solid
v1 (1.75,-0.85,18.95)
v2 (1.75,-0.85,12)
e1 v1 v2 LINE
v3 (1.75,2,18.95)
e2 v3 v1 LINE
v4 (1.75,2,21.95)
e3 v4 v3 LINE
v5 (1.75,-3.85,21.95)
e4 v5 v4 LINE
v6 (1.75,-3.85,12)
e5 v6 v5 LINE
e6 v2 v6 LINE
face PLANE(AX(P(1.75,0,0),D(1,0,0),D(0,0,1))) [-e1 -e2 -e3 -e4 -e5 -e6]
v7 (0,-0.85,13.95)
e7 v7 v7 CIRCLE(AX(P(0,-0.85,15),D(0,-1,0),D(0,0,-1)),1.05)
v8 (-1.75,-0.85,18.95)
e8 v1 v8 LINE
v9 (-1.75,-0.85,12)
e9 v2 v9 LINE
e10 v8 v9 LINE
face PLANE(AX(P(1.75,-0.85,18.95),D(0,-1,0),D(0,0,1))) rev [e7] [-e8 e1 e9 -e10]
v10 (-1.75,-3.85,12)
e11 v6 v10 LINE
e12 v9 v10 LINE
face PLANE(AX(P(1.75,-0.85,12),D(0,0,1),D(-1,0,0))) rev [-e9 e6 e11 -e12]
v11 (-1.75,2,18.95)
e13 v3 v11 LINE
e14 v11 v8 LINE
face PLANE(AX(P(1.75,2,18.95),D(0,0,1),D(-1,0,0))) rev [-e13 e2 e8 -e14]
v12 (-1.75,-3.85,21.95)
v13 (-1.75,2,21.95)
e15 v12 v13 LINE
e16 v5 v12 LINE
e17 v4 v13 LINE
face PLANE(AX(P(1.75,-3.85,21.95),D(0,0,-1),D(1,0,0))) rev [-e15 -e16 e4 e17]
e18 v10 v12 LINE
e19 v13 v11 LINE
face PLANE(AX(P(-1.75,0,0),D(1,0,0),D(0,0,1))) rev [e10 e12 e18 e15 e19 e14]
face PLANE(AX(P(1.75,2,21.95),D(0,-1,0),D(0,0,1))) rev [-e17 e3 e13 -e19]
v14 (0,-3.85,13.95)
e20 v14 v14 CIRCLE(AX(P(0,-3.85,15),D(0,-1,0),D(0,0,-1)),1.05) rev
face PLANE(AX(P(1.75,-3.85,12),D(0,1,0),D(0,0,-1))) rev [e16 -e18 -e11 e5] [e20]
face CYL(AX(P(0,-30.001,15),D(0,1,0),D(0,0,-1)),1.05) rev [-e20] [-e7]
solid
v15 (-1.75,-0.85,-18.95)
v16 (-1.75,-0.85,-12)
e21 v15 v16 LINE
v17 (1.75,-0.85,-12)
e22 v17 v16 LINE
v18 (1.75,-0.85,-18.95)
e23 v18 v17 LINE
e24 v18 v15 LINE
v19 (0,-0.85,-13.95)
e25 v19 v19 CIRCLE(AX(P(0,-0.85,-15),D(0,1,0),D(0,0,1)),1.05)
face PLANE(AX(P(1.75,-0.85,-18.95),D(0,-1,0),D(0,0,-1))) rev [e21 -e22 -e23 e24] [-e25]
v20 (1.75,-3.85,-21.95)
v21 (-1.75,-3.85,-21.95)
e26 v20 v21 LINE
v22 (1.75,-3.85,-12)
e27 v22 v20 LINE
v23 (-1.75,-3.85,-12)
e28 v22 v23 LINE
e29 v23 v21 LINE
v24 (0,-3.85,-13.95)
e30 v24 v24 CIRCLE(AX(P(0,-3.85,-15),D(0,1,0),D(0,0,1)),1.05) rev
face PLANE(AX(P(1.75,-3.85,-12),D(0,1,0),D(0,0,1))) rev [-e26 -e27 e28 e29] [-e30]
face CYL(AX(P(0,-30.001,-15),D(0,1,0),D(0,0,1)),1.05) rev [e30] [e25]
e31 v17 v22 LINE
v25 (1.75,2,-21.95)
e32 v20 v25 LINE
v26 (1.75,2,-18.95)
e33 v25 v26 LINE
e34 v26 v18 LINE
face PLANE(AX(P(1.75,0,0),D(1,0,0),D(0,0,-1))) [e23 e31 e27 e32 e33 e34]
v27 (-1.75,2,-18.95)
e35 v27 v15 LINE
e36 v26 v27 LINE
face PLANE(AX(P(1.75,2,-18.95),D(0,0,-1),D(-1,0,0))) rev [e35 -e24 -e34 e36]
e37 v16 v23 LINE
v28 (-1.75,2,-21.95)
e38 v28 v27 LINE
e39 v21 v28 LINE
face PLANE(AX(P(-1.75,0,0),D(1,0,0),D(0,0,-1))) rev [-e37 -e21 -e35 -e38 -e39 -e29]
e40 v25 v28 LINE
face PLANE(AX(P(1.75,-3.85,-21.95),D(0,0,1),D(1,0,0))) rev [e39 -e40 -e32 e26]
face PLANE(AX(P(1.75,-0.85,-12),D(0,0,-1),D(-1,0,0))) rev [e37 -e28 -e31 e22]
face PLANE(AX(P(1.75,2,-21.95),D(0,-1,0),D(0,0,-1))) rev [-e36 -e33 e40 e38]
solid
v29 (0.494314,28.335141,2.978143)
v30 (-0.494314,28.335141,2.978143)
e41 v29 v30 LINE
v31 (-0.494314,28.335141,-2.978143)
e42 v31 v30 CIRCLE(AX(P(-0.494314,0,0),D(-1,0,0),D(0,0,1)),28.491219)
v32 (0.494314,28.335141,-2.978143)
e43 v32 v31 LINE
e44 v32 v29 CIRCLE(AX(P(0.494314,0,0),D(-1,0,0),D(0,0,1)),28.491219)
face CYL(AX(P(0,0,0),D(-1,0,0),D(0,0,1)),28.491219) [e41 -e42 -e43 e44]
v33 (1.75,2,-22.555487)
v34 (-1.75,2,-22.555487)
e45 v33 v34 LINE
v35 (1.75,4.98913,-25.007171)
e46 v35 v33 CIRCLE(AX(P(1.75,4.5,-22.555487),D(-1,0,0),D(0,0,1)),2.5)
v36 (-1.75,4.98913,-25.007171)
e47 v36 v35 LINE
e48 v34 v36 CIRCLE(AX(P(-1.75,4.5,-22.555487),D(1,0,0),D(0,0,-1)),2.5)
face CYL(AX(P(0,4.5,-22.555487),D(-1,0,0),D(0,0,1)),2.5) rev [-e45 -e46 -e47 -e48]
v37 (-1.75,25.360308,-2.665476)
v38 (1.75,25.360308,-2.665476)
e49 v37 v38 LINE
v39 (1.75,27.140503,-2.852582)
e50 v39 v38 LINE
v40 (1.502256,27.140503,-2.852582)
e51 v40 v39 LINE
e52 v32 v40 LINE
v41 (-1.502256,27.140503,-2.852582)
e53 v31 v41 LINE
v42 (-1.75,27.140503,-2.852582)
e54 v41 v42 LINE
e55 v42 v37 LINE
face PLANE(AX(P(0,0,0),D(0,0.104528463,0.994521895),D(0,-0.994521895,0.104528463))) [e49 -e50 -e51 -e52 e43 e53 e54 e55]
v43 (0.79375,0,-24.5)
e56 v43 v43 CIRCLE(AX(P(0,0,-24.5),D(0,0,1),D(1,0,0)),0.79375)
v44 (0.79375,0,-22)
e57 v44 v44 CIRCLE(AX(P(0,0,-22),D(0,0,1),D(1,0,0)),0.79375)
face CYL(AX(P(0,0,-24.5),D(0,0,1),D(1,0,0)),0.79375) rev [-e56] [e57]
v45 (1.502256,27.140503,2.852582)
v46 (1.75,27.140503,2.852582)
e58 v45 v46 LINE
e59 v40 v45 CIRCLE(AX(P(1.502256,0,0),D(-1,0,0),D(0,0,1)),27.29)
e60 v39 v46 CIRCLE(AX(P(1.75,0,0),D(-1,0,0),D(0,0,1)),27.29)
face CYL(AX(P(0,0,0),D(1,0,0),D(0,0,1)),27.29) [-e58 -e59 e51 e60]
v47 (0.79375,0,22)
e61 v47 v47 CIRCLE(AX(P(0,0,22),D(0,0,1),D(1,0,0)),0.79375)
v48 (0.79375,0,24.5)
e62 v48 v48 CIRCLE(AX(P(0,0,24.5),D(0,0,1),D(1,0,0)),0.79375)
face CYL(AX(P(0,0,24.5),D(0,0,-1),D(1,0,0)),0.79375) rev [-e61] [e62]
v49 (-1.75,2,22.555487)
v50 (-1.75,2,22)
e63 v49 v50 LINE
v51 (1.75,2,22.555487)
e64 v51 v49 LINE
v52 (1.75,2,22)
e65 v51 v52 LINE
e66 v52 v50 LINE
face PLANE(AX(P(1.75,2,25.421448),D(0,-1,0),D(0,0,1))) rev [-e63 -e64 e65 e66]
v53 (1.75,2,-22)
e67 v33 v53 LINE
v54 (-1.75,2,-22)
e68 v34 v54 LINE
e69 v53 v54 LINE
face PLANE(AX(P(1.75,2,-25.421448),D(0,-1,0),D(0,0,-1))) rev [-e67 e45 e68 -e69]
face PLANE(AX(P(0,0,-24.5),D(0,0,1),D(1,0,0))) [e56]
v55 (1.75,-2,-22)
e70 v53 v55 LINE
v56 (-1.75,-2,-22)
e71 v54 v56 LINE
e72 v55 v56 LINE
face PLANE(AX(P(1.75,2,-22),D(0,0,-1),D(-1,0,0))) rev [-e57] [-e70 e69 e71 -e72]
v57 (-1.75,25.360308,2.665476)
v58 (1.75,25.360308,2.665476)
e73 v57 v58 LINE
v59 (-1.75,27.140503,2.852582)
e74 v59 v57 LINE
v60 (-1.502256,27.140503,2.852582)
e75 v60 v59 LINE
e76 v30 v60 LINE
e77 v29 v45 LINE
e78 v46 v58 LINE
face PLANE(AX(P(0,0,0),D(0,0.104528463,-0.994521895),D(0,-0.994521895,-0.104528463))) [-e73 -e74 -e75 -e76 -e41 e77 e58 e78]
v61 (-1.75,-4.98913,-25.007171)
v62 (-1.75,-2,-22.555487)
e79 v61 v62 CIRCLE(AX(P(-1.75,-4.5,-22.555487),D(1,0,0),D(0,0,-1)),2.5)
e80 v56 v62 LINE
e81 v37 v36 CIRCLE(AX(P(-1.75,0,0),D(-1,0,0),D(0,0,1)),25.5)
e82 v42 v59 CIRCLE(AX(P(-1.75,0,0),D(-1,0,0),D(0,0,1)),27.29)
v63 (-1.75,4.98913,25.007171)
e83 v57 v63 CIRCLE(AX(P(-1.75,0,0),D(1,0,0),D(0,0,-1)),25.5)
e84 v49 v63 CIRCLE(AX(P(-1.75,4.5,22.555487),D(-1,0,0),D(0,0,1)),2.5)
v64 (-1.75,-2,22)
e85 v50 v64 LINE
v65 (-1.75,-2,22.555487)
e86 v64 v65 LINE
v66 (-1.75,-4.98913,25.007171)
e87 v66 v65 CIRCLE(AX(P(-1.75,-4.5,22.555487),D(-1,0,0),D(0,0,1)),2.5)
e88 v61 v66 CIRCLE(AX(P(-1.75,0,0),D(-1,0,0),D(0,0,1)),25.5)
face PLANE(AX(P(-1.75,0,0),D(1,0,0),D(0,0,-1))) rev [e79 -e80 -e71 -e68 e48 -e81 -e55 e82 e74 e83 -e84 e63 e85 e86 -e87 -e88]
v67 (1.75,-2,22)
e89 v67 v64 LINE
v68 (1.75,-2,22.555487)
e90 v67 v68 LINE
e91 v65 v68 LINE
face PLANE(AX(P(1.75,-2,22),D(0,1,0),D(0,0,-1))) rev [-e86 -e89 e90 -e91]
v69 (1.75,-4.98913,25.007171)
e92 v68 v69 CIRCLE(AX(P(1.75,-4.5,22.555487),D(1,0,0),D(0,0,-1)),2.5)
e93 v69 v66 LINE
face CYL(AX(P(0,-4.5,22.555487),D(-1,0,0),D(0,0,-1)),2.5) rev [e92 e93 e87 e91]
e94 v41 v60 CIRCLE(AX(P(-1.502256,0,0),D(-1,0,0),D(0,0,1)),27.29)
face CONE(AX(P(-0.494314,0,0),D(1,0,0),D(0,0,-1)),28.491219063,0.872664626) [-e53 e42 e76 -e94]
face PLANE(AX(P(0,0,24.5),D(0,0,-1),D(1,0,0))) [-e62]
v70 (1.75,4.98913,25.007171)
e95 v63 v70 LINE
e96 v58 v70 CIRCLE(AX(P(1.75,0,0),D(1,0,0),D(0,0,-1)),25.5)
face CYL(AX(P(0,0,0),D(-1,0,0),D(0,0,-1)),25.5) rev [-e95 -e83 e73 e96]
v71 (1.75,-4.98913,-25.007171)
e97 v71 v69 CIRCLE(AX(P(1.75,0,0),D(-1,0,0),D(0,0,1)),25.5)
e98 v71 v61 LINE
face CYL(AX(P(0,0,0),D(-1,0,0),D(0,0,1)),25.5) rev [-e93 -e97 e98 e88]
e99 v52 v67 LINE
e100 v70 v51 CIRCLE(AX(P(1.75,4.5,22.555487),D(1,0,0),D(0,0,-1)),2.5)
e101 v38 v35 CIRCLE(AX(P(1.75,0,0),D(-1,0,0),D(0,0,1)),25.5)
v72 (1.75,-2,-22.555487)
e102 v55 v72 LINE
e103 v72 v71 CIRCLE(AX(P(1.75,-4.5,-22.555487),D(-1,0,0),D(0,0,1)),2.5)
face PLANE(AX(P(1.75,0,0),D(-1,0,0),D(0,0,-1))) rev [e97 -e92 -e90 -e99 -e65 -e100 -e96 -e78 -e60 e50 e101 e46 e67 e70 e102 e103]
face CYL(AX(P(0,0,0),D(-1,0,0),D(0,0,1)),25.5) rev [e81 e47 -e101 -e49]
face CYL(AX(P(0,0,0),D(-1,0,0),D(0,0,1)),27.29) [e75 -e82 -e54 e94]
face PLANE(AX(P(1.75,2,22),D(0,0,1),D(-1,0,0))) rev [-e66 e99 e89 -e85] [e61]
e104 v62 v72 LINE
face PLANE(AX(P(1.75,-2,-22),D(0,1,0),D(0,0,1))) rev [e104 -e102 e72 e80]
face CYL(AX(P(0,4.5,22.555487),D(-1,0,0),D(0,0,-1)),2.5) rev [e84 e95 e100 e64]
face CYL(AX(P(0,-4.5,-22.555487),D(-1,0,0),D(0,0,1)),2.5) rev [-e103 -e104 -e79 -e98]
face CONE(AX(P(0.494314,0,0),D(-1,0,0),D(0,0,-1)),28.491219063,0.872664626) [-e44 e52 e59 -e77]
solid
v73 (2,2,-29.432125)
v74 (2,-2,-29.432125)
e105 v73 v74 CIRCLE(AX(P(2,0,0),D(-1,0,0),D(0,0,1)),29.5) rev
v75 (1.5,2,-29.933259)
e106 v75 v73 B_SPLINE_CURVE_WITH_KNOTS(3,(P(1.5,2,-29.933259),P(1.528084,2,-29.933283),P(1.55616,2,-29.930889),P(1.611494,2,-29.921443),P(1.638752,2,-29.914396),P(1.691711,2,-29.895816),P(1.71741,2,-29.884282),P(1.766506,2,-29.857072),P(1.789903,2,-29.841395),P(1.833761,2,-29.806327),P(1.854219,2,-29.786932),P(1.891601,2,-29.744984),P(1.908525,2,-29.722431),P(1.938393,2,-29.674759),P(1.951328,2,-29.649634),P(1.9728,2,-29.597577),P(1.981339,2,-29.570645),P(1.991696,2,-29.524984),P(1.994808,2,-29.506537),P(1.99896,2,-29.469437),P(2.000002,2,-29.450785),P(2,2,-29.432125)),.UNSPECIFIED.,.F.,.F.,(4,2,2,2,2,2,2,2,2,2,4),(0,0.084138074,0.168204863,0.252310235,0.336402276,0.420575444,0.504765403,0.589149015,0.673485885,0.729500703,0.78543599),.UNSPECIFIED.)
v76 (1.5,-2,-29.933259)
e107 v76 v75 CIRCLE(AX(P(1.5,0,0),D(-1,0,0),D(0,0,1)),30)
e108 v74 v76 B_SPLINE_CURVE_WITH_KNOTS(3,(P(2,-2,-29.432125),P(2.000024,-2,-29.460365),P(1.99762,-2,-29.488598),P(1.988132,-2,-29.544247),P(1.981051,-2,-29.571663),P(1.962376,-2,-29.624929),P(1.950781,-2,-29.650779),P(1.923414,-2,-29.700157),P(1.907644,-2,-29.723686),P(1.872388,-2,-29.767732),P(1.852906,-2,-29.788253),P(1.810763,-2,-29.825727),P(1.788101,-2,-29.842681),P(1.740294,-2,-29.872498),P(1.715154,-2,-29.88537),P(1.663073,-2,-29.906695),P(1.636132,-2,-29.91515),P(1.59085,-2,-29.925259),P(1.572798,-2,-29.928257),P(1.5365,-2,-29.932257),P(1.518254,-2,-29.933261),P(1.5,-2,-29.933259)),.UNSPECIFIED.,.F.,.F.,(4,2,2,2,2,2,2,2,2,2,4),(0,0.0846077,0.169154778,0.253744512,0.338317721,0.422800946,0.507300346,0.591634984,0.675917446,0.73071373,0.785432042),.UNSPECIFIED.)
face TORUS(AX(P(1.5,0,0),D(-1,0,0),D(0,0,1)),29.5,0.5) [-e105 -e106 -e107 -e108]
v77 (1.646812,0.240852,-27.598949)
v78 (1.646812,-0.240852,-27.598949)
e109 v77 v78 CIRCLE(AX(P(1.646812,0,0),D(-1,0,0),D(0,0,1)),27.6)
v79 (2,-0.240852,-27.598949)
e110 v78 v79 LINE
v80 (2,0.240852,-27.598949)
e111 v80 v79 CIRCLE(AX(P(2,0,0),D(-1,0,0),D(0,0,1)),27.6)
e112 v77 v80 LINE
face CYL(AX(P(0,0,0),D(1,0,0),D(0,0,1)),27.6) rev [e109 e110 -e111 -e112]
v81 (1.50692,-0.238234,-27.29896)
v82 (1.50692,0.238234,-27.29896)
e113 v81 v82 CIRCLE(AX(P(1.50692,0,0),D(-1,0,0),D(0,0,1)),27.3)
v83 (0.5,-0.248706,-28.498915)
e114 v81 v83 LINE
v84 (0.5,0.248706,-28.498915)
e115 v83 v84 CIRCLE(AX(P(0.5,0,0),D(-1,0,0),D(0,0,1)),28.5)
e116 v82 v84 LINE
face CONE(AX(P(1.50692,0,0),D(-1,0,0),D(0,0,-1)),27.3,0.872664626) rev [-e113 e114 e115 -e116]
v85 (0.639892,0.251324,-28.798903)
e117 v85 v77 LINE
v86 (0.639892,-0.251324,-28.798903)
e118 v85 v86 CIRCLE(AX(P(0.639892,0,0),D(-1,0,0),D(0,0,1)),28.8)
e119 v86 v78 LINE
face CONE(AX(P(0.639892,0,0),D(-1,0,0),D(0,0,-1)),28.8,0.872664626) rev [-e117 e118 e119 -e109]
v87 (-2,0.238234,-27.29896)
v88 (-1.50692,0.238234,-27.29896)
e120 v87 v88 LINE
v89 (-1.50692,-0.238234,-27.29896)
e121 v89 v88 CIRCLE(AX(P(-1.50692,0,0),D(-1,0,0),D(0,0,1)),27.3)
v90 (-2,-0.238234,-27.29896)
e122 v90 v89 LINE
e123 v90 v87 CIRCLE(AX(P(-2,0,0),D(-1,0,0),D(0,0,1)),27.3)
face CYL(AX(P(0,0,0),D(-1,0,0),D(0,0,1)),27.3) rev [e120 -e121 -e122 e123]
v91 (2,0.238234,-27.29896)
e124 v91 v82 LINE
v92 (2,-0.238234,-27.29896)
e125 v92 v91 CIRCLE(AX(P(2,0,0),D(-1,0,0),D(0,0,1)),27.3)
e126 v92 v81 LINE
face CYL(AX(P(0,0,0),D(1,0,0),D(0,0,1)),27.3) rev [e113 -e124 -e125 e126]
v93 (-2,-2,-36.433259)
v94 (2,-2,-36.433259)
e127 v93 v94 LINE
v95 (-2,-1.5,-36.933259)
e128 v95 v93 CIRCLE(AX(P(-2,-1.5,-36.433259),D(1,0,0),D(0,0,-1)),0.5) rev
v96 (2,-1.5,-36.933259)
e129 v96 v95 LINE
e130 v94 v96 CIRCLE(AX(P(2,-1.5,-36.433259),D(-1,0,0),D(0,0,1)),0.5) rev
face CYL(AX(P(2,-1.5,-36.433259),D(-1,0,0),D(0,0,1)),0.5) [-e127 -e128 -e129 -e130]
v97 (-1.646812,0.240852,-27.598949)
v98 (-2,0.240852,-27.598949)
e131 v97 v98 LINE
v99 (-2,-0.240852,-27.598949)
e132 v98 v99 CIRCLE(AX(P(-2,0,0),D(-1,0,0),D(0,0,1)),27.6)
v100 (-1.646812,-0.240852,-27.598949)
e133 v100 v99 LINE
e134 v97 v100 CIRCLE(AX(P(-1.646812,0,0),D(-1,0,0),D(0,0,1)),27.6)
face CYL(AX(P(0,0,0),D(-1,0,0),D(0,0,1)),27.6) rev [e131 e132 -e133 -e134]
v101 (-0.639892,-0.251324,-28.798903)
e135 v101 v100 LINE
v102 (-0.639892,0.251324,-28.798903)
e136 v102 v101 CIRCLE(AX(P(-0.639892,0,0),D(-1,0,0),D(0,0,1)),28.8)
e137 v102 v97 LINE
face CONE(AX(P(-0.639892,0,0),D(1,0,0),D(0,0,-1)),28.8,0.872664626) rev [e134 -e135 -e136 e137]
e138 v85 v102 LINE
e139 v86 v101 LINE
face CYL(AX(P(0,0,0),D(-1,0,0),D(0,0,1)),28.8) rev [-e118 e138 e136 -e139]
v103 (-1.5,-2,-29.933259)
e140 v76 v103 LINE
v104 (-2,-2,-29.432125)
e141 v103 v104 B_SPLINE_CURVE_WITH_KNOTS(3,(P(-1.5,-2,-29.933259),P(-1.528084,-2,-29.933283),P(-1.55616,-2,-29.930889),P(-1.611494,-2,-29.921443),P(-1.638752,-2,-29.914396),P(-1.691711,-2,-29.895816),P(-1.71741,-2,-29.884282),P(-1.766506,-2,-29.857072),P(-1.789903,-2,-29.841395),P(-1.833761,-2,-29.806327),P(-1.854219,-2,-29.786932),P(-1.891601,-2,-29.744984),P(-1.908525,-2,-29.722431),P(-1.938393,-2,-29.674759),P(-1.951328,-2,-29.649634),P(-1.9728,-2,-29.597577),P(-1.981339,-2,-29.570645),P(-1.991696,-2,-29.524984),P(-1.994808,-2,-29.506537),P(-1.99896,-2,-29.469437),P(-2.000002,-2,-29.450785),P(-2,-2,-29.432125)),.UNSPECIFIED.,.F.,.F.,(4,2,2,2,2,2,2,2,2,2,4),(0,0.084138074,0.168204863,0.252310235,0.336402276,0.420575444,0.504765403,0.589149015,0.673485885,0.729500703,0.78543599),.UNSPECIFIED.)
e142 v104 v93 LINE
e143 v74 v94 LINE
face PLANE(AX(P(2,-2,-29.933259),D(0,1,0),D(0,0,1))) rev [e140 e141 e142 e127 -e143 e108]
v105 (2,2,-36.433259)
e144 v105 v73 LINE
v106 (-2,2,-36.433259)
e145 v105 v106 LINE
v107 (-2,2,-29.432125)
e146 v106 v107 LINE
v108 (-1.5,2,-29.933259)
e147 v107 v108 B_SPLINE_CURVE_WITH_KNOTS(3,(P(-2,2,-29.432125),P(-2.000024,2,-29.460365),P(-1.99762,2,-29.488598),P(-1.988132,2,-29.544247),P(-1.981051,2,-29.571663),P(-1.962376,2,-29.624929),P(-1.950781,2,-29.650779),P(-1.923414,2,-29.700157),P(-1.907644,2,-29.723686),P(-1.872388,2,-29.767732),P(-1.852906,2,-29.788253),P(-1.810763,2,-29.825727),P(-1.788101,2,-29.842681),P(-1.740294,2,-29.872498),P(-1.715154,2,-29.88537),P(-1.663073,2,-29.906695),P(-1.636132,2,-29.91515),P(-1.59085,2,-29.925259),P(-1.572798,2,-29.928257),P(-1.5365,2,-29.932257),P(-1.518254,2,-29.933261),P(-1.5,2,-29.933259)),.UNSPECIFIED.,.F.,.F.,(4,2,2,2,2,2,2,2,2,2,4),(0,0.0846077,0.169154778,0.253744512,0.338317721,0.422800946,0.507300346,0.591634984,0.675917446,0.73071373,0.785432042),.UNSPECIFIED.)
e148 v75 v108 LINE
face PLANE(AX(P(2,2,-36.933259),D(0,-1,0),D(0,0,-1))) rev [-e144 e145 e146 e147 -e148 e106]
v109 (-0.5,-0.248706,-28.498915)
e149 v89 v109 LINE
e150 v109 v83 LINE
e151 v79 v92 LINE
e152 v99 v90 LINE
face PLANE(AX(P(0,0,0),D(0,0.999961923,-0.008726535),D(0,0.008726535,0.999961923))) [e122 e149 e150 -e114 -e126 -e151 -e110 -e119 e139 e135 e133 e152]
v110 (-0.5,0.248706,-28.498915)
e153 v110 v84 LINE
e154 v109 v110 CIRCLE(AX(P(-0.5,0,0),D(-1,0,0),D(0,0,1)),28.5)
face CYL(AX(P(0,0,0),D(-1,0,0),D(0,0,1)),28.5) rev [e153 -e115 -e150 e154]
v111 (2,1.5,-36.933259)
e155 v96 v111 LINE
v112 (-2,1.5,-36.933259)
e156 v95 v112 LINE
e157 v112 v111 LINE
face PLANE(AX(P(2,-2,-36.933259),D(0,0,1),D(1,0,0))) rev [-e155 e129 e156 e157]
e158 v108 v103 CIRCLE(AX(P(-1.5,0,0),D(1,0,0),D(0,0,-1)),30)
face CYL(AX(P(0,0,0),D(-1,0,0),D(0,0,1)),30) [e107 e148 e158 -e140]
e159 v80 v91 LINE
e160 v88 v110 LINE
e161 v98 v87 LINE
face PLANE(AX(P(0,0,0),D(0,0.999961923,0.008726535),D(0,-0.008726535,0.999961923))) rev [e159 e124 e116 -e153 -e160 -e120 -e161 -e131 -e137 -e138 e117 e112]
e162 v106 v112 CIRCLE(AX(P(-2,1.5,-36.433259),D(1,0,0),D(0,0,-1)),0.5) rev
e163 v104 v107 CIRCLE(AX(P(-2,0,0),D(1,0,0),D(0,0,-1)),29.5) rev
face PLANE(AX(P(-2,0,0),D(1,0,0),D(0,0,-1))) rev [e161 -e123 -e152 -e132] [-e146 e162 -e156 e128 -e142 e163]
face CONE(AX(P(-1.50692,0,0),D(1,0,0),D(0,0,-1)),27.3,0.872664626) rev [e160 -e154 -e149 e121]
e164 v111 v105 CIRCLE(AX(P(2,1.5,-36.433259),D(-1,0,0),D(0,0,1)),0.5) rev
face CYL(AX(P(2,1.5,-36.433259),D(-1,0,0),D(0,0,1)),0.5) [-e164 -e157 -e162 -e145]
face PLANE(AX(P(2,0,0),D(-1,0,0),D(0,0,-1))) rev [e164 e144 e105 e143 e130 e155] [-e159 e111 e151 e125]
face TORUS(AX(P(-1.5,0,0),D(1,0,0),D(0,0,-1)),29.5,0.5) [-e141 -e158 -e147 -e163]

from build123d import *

# Parameters (mm, degrees)
REVOLVE2_ANGLE      = 174
BOSS_EXTRUDE3_DEPTH = 1.75
SKETCH9_R           = 0.79375
CUT_EXTRUDE2_DEPTH  = 2.5
BOSS_EXTRUDE5_DEPTH = 1.75
SKETCH14_R          = 1.05
CUT_EXTRUDE4_DEPTH  = 3
FILLET5_R           = 2.5
SKETCH5_W           = 7
SKETCH5_H           = 4
BOSS_EXTRUDE2_DEPTH = 2
CUT_REVOLVE1_ANGLE  = 1
FILLET3_R           = 0.5
FILLET4_R           = 0.5


# Read off the part's stored shape, not the designer's step: Revolve2
with BuildPart() as part:
    # Sketch2 → Revolve1 (revolve)
    with BuildSketch(Plane(origin=(0, 0, 0), x_dir=(1, 0, 0), z_dir=(0, 1, 0)), mode=Mode.PRIVATE) as revolve1_sk:
        Polygon((-0.5, 28.5), (0, 28.5), (0, 30), (-2, 30), (-2, 27.3), (-1.506919557, 27.3), align=None)
    revolve1 = revolve(revolve1_sk.sketch.rotate(Axis((0, 0, 0), (1, 0, 0)), 180), axis=Axis((0, 0, 0), (1, 0, 0)))


with BuildPart() as body_2:
    # Revolve2 outline → Revolve2 (revolve)
    with BuildSketch(Plane(origin=(0, 0, 0), x_dir=(0, -1, 0), z_dir=(0, 0, 1))):
        Polygon((25.5, 0), (25.5, -1.75), (27.29, -1.75), (27.29, -1.502256481), (28.491219063, -0.494314008), (28.491219063, 0), align=None)
    revolve2 = revolve(axis=Axis((0, 0, 0), (1, 0, 0)), revolution_arc=REVOLVE2_ANGLE)


with BuildPart() as part_1:
    add(part.part)

    add(body_2.part)  # Mirror1 merges body 2
    # Mirror1: Revolve1, Revolve2 across plane
    add(revolve1.mirror(Plane(origin=(0, 0, 0), x_dir=(0, 0, 1), z_dir=(1, 0, 0))))
    add(revolve2.mirror(Plane(origin=(0, 0, 0), x_dir=(0, 0, 1), z_dir=(1, 0, 0))))

    # Sketch8 → Boss-Extrude3 (add, symmetric)
    with BuildSketch(Plane(origin=(0, 0, 0), x_dir=(0, 0, -1), z_dir=(1, 0, 0))):
        with BuildLine():
            Line((25.421447638, 2), (22, 2))
            Line((22, 2), (22, -2))
            Line((22, -2), (25.421447638, -2))
            ThreePointArc((25.421447638, -2), (25.5, 0), (25.421447638, 2))
        make_face()
    extrude(amount=BOSS_EXTRUDE3_DEPTH, both=True)

    # Sketch9 → Cut-Extrude2 (cut)
    with BuildSketch(Plane.XY.offset(-22)):
        Circle(SKETCH9_R)
    extrude(amount=-CUT_EXTRUDE2_DEPTH, mode=Mode.SUBTRACT)

    # Fillet5
    fillet5_edges = [part_1.edges().sort_by_distance(p)[0] for p in [
        (0, -2, -25.421447638),
        (0, 2, -25.421447638),
    ]]
    fillet(fillet5_edges, radius=FILLET5_R)

    # Mirror2: part across plane


with BuildPart() as body_2_2:
    # Sketch13 → Boss-Extrude5 (new, symmetric)
    with BuildSketch(Plane(origin=(0, 0, 0), x_dir=(0, 0, -1), z_dir=(1, 0, 0))):
        Polygon((21.95, 2), (18.95, 2), (18.95, -0.85), (12, -0.85), (12, -3.85), (21.95, -3.85), align=None)
    extrude(amount=BOSS_EXTRUDE5_DEPTH, both=True)

    # Sketch14 → Cut-Extrude4 (cut)
    with BuildSketch(Plane(origin=(0, -0.85, 0), x_dir=(1, 0, 0), z_dir=(0, 1, 0))):
        with Locations(Location((0, 15, 0), (0, 0, 270))):
            Circle(SKETCH14_R)
    extrude(amount=-CUT_EXTRUDE4_DEPTH, mode=Mode.SUBTRACT)


with BuildPart() as part_2:
    add(part_1.part)
    add(part_1.part.mirror(Plane.XY))

    # Sketch5 → Boss-Extrude2 (add, symmetric)
    with BuildSketch(Plane(origin=(0, 0, 0), x_dir=(0, 0, -1), z_dir=(1, 0, 0))):
        with Locations((33.433259094, 0)):
            Rectangle(SKETCH5_W, SKETCH5_H)
    extrude(amount=BOSS_EXTRUDE2_DEPTH, both=True)

    # Sketch6 → Cut-Revolve1 (revolve, symmetric, cut)
    with BuildSketch(Plane(origin=(0, 0, 0), x_dir=(1, 0, 0), z_dir=(0, 1, 0))) as cut_revolve1_sk:
        Polygon((-2, 27.6), (-2, 27.3), (-1.506919557, 27.3), (-0.5, 28.5), (0, 28.5), (0, 28.8), (-0.639892297, 28.8), (-1.646811855, 27.6), align=None)
    cut_revolve1 = revolve(axis=Axis((0, 0, 0), (1, 0, 0)), revolution_arc=CUT_REVOLVE1_ANGLE / 2, mode=Mode.SUBTRACT)
    cut_revolve1 = cut_revolve1 + revolve(cut_revolve1_sk.sketch, axis=Axis((0, 0, 0), (-1, 0, 0)), revolution_arc=CUT_REVOLVE1_ANGLE / 2, mode=Mode.SUBTRACT)

    # Mirror3: Cut-Revolve1 across plane
    add(cut_revolve1.mirror(Plane(origin=(0, 0, 0), x_dir=(0, 0, 1), z_dir=(1, 0, 0))), mode=Mode.SUBTRACT)

    # Fillet3
    fillet3_edges = [part_2.edges().sort_by_distance(p)[0] for p in [
        (0, 2, -36.933259094),
        (0, -2, -36.933259094),
    ]]
    fillet(fillet3_edges, radius=FILLET3_R)

    # Fillet4
    fillet4_edges = [part_2.edges().sort_by_distance(p)[0] for p in [
        (2, -29.983310131, 1.000556639),
        (-2, -29.983310131, 1.000556639),
    ]]
    fillet(fillet4_edges, radius=FILLET4_R)


with BuildPart() as body_3:
    # Mirror6: mirrored copy
    add(body_2_2.part.mirror(Plane.XY))


solid = Compound([body_2_2.part, part_2.part, body_3.part])
